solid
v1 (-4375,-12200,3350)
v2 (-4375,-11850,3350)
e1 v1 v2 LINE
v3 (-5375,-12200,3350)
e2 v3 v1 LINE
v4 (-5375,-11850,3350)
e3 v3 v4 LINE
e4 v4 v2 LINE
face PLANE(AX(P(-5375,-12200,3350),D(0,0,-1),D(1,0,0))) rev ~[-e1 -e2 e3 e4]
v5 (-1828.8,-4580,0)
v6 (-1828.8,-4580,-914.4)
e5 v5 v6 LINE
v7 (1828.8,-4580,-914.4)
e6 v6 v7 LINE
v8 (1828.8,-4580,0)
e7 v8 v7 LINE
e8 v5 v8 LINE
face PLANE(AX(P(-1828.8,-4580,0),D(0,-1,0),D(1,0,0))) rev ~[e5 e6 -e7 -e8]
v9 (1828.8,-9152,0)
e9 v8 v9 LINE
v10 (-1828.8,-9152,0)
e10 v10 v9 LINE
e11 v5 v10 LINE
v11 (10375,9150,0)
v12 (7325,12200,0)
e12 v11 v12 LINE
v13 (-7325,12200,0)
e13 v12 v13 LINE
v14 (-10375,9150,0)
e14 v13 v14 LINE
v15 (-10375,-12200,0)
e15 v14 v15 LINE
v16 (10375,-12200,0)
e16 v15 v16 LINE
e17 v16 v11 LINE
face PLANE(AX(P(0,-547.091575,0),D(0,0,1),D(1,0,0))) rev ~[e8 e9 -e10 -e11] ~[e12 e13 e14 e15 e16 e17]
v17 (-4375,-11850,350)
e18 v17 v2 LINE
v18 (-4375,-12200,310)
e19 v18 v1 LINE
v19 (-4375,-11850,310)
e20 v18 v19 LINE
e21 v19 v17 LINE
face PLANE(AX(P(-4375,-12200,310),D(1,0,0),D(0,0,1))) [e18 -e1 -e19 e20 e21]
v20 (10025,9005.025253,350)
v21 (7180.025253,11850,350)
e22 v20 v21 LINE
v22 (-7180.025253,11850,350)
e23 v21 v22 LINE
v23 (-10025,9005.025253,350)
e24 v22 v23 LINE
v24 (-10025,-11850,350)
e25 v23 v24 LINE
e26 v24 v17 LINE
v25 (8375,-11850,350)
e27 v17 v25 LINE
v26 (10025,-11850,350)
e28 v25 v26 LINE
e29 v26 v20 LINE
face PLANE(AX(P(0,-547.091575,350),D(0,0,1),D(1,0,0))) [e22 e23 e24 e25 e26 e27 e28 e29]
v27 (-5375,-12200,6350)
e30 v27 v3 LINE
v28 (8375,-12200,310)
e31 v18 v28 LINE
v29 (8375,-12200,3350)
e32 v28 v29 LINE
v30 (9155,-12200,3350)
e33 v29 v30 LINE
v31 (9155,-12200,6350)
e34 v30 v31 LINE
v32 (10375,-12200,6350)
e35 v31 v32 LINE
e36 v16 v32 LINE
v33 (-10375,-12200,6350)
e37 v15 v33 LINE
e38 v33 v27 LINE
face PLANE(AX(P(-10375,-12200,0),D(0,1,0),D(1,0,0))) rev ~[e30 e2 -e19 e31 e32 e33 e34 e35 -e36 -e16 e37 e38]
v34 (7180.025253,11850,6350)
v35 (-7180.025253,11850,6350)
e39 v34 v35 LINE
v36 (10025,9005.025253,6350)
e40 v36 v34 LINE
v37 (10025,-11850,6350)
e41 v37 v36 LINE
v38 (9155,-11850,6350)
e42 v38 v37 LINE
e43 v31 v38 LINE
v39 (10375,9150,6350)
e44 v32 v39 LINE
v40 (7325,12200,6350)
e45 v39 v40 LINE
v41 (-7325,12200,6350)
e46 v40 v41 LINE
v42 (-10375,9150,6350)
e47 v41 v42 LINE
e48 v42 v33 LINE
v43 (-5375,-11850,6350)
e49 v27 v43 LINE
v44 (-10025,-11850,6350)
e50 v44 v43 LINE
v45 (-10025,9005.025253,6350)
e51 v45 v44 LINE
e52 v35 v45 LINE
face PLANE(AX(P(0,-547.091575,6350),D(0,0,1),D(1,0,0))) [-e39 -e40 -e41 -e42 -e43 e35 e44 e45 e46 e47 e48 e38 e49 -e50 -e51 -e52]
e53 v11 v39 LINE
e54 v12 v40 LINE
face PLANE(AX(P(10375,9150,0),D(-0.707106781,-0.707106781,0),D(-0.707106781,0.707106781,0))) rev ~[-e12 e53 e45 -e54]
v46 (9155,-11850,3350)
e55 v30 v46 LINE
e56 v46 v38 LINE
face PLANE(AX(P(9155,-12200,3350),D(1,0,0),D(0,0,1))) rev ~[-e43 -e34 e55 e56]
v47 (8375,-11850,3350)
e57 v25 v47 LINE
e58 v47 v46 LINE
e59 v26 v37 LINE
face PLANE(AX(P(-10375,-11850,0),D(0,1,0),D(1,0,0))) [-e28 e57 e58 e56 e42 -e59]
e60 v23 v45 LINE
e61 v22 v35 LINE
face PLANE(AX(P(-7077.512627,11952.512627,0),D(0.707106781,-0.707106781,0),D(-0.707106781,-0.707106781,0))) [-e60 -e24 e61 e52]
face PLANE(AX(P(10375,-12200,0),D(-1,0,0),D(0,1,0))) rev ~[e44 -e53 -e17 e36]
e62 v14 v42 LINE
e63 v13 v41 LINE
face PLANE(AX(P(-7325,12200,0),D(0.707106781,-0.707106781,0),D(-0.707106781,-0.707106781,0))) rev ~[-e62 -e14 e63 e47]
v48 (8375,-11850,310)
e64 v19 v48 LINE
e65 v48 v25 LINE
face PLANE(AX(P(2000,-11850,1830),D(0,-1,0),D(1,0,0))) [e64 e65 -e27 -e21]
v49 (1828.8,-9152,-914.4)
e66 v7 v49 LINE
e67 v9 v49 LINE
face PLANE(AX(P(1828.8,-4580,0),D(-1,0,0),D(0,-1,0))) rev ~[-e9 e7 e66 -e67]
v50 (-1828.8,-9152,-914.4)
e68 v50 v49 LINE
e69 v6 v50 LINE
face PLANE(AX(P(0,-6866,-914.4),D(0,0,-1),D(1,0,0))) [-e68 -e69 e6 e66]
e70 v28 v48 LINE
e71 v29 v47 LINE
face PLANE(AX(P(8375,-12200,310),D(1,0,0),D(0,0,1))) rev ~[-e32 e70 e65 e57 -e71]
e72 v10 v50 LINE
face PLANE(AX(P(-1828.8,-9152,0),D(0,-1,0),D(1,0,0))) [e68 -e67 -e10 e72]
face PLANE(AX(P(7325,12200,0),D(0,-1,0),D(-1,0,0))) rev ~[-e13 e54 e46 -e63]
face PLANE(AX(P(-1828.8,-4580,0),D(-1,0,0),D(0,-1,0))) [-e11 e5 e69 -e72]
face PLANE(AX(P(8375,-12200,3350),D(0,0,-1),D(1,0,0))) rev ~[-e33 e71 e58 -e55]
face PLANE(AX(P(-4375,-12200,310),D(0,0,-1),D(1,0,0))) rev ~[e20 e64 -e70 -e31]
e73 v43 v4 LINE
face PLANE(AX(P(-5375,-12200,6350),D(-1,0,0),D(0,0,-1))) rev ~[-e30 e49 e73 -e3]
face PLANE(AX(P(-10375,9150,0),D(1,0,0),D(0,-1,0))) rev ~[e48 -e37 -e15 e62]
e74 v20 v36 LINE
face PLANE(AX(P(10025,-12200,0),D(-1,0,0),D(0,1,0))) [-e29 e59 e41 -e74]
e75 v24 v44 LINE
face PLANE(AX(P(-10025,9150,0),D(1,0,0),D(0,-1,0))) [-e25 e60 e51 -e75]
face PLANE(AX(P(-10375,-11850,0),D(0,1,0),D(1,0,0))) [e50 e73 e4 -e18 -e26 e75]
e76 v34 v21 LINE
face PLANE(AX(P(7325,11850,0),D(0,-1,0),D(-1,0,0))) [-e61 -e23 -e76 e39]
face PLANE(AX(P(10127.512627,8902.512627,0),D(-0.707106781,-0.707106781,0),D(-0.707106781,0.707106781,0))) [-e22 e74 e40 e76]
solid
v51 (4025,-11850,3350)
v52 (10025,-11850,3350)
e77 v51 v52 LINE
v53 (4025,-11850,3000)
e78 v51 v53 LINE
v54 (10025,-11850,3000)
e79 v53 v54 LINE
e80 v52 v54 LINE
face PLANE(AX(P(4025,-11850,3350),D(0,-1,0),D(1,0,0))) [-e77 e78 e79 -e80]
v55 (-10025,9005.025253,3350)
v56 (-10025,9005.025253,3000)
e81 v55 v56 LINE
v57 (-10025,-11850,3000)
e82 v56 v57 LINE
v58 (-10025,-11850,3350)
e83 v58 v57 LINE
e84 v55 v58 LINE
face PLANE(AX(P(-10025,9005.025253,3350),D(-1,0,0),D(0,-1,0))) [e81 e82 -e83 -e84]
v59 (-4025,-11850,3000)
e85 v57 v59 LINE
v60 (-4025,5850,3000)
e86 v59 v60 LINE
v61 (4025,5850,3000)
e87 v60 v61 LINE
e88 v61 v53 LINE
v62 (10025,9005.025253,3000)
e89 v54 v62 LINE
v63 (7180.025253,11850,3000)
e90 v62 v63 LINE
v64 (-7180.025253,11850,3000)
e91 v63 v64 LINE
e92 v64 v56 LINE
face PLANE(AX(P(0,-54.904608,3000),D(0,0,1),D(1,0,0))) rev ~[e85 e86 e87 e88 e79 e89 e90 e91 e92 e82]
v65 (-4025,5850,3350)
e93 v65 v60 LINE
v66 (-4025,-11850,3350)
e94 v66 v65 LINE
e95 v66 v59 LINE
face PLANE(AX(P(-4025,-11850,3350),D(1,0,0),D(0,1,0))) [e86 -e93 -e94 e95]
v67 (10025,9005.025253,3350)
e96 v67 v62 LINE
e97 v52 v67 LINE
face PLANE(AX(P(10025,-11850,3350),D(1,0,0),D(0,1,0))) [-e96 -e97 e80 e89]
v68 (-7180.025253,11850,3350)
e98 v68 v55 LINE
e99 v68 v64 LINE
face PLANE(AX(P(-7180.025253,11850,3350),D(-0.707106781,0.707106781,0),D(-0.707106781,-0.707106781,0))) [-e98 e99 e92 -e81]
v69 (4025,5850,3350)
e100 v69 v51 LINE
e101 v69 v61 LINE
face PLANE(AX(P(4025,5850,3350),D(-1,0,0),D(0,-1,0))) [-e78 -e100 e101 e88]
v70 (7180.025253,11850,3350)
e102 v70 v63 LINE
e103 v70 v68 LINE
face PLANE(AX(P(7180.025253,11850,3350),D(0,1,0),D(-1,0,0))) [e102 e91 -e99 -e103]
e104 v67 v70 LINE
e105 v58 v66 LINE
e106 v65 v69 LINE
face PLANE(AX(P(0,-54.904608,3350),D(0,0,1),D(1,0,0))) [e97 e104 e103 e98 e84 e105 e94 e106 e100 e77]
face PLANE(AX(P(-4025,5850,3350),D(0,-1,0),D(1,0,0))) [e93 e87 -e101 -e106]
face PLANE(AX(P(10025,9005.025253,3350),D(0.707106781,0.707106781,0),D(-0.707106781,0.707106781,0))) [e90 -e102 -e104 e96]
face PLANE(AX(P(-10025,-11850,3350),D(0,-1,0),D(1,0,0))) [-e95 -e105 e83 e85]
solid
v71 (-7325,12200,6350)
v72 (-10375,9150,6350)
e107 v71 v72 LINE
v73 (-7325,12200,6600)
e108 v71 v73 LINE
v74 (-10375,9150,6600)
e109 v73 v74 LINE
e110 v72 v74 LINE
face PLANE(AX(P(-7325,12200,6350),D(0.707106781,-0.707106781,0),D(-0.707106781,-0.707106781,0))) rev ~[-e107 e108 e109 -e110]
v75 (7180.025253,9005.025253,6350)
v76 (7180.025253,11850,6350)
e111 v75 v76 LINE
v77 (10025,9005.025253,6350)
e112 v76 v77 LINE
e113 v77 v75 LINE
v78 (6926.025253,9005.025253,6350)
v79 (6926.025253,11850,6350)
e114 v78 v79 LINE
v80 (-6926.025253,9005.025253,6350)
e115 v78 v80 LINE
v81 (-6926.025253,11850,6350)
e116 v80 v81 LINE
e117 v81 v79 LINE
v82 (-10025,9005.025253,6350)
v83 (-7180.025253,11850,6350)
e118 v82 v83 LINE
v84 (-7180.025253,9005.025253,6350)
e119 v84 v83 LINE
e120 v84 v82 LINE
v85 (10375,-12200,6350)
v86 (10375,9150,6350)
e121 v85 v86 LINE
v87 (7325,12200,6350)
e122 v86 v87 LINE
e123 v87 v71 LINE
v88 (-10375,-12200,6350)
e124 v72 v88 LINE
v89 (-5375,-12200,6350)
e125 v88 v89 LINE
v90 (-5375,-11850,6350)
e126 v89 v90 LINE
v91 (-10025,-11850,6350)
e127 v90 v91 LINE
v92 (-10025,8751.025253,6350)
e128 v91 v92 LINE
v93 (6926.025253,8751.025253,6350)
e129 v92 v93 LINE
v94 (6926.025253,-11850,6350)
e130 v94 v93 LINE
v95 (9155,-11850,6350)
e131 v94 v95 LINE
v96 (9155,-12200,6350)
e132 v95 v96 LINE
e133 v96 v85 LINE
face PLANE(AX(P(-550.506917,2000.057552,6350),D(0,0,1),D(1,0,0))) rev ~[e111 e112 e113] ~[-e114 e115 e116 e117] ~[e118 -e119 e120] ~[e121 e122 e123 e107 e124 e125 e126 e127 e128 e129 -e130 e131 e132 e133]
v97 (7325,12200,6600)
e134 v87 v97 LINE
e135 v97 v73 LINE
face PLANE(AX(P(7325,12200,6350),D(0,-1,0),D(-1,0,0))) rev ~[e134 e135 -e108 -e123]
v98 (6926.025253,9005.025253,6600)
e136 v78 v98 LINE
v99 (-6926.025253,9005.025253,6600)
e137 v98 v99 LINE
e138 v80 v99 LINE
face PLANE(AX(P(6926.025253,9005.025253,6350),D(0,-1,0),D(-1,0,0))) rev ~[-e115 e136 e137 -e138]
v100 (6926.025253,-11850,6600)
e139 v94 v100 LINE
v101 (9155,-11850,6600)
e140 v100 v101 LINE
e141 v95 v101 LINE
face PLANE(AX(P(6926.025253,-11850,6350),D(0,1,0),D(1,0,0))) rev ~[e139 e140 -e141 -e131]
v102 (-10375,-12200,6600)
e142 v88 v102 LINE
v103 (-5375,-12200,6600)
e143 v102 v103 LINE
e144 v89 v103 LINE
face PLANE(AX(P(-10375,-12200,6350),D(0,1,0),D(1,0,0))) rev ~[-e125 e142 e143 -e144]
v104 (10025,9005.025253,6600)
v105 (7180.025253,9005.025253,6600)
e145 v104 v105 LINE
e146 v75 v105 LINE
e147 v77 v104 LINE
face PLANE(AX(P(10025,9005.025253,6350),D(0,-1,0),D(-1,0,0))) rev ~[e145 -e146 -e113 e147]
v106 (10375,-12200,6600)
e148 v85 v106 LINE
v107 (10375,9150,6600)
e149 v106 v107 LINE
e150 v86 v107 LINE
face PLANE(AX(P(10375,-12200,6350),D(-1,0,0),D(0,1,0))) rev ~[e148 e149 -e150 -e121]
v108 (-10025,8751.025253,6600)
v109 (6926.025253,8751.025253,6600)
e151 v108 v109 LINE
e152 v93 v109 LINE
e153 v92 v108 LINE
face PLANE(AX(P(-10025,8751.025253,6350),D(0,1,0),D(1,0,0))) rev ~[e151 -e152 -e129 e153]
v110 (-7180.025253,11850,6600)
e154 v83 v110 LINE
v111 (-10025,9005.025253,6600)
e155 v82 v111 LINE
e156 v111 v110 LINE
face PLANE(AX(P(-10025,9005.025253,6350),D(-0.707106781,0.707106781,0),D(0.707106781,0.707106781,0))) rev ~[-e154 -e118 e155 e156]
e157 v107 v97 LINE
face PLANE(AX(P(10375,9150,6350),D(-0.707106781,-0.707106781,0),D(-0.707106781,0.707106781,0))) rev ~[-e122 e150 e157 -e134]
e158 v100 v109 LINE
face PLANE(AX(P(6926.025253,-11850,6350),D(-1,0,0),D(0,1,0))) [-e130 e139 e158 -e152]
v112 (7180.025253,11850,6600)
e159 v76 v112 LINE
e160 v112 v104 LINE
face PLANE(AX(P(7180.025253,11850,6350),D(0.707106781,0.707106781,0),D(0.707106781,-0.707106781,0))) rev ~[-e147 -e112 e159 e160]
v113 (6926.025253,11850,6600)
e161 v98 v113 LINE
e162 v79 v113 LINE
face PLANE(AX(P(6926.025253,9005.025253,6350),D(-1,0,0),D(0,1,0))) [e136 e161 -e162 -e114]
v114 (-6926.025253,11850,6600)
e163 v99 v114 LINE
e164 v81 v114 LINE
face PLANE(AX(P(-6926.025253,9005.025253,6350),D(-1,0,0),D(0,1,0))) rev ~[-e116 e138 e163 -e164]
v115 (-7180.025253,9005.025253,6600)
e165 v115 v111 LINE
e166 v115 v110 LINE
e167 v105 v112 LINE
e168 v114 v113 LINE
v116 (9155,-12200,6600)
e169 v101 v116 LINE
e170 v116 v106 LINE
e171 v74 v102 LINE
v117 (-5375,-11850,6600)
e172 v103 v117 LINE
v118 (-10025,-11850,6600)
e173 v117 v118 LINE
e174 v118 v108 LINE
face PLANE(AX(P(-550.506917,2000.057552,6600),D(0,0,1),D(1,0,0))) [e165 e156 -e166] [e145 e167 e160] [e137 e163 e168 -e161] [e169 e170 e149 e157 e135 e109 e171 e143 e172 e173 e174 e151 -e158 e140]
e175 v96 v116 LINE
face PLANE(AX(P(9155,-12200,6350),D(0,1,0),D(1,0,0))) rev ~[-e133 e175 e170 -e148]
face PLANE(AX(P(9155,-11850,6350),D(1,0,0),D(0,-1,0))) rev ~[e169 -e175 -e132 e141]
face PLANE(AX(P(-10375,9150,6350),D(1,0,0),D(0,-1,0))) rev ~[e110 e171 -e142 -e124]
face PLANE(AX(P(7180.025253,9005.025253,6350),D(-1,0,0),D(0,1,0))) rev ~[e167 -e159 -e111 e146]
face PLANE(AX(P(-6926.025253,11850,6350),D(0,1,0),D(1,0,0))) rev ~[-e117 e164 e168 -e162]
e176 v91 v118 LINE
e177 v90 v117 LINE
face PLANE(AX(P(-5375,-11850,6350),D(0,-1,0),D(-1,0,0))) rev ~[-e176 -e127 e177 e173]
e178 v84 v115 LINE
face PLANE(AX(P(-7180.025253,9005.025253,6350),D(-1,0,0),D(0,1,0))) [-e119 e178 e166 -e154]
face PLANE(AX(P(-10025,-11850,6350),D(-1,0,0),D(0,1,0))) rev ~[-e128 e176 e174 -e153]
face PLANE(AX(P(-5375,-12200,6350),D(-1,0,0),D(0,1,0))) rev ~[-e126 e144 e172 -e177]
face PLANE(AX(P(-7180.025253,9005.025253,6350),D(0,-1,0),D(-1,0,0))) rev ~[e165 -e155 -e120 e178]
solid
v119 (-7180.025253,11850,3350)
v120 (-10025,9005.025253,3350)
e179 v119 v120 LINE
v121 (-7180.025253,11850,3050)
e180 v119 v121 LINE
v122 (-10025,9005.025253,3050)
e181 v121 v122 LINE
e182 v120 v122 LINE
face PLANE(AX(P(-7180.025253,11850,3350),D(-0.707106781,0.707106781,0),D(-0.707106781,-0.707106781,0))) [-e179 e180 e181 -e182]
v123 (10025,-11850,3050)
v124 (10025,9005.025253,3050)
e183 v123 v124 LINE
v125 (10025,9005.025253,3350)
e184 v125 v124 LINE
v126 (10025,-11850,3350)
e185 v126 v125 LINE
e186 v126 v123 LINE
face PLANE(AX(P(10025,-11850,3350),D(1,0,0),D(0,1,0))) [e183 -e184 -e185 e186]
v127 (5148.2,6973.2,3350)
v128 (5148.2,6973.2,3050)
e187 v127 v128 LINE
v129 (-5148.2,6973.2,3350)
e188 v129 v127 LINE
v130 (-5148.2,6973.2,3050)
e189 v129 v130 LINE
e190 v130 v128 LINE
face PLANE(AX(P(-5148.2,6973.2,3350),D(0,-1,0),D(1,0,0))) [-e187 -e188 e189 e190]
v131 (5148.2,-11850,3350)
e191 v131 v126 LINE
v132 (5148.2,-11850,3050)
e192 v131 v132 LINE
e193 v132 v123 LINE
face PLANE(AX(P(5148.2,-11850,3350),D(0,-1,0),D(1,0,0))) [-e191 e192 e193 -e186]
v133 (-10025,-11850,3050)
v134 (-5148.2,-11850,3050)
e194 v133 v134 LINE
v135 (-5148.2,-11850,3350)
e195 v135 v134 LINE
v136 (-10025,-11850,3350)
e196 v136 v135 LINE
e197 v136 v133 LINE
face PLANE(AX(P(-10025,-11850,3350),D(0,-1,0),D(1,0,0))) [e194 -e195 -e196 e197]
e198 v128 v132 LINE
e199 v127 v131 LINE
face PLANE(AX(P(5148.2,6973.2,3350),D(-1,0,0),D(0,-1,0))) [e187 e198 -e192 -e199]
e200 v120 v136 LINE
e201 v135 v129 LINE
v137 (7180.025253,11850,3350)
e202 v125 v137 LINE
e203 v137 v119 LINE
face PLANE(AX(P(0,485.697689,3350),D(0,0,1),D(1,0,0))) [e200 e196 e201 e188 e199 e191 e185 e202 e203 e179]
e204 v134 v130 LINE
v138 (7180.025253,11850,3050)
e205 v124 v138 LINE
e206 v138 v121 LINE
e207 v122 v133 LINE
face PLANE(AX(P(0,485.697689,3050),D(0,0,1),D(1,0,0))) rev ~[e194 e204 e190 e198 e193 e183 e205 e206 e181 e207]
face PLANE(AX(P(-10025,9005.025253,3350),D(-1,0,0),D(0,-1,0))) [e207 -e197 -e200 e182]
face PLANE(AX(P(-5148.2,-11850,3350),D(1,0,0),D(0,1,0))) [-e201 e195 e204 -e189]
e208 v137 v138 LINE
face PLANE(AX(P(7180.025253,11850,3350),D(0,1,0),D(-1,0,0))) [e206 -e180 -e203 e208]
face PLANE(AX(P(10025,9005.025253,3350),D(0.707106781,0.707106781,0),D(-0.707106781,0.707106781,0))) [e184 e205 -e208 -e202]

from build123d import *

# Parameters (mm, degrees)
F1_DEPTH  = 6350
F2_T      = -350
F3_W      = 12750
F3_H      = 3040
F4_DEPTH  = 350
F5_W      = 13852.0505063388
F5_H      = 254
F5_W_2    = 254
F5_H_2    = 20601.0252531694
F5_W_3    = 2844.9747468306
F5_H_3    = 2844.9747468306
F6_DEPTH  = 250
F7_W      = 3657.6
F7_H      = 4572
F8_DEPTH  = 914.4
F10_DEPTH = 300
F12_DEPTH = 350


# Not quite as in the source:
# - a feature names something its author has since deleted; it is built from what else it names


with BuildPart() as f1:
    # F0 (on Top) → F1 (new body)
    with BuildSketch(Plane.XY):
        Polygon((7325, 12200), (-7325, 12200), (-10375, 9150), (-10375, -12200), (10375, -12200), (10375, 9150), align=None)
    extrude(amount=F1_DEPTH)

    # F2
    f2_openings = [f1.faces().sort_by_distance(p)[0] for p in [
        (0, -209.322901, 6350),
    ]]
    offset(amount=F2_T, openings=f2_openings)

    # F3 (on face) → F4 (cut, through all)
    with BuildSketch(Plane.XZ.offset(12200)):
        with Locations((2000, 1830)):
            Rectangle(F3_W, F3_H)
        Polygon((9155, 6350), (-5375, 6350), (-5375, 3350), (-4375, 3350), (8375, 3350), (9155, 3350), align=None)
    extrude(amount=-F4_DEPTH, mode=Mode.SUBTRACT)

    # F7 (on face) → F8 (join)
    with BuildSketch(Plane(origin=(0, 0, 0), x_dir=(1, 0, 0), z_dir=(0, 0, -1))):
        with Locations((0, 6866)):
            Rectangle(F7_W, F7_H)
    extrude(amount=F8_DEPTH)


with BuildPart() as f6:
    # F5 (on face) → F6 (new body)
    with BuildSketch(Plane.XY.offset(6350)):
        Polygon((-7325, 12200), (-10375, 9150), (-10375, -12200), (-5375, -12200), (-5375, -11850), (-6926.0252531694, -11850), (-10025, -11850), (-10025, 8751.0252531694), (-10025, 9005.0252531694), (-7180.0252531694, 11850), (-6926.0252531694, 11850), (6926.0252531694, 11850), (7180.0252531694, 11850), (10025, 9005.0252531694), (10025, 8751.0252531694), (10025, -11850), (10375, -11850), (10375, 9150), (7325, 12200), align=None)
        Polygon((10375, -12200), (10375, -11850), (10025, -11850), (9155, -11850), (9155, -12200), align=None)
        with Locations((0, 8878.0252531694)):
            Rectangle(F5_W, F5_H)
        with Locations((-7053.0252531694, 8878.0252531694)):
            Rectangle(F5_W_2, F5_H)
        with Locations((7053.0252531694, -1549.4873734153)):
            Rectangle(F5_W_2, F5_H_2)
        Polygon((9155, -11850), (10025, -11850), (10025, 8751.0252531694), (7180.0252531694, 8751.0252531694), (7180.0252531694, -11850), align=None)
        with Locations((-8602.5126265847, 8878.0252531694)):
            Rectangle(F5_W_3, F5_H)
        with Locations((7053.0252531694, 8878.0252531694)):
            Rectangle(F5_W_2, F5_H)
        with Locations((-7053.0252531694, 10427.5126265847)):
            Rectangle(F5_W_2, F5_H_3)
        with Locations((8602.5126265847, 8878.0252531694)):
            Rectangle(F5_W_3, F5_H)
        with Locations((7053.0252531694, 10427.5126265847)):
            Rectangle(F5_W_2, F5_H_3)
    extrude(amount=F6_DEPTH)


with BuildPart() as f10:
    # F9 (on face) → F10 (new body)
    with BuildSketch(Plane.XY.offset(3350)):
        Polygon((-10025, 9005.0252531694), (-10025, -11850), (-5375, -11850), (-5148.2, -11850), (-5148.2, 6973.2), (5148.2, 6973.2), (5148.2, -11850), (10025, -11850), (10025, 9005.0252531694), (7180.0252531694, 11850), (-7180.0252531694, 11850), align=None)
    extrude(amount=-F10_DEPTH)


with BuildPart() as f12:
    # F11 (on face) → F12 (new body)
    with BuildSketch(Plane.XY.offset(3350)):
        Polygon((-10025, 9005.0252531694), (-10025, -11850), (-4025, -11850), (-4025, 5850), (4025, 5850), (4025, -11850), (10025, -11850), (10025, 9005.0252531694), (7180.0252531694, 11850), (-7180.0252531694, 11850), align=None)
    extrude(amount=-F12_DEPTH)


solid = Compound([f1.part, f6.part, f10.part, f12.part])
